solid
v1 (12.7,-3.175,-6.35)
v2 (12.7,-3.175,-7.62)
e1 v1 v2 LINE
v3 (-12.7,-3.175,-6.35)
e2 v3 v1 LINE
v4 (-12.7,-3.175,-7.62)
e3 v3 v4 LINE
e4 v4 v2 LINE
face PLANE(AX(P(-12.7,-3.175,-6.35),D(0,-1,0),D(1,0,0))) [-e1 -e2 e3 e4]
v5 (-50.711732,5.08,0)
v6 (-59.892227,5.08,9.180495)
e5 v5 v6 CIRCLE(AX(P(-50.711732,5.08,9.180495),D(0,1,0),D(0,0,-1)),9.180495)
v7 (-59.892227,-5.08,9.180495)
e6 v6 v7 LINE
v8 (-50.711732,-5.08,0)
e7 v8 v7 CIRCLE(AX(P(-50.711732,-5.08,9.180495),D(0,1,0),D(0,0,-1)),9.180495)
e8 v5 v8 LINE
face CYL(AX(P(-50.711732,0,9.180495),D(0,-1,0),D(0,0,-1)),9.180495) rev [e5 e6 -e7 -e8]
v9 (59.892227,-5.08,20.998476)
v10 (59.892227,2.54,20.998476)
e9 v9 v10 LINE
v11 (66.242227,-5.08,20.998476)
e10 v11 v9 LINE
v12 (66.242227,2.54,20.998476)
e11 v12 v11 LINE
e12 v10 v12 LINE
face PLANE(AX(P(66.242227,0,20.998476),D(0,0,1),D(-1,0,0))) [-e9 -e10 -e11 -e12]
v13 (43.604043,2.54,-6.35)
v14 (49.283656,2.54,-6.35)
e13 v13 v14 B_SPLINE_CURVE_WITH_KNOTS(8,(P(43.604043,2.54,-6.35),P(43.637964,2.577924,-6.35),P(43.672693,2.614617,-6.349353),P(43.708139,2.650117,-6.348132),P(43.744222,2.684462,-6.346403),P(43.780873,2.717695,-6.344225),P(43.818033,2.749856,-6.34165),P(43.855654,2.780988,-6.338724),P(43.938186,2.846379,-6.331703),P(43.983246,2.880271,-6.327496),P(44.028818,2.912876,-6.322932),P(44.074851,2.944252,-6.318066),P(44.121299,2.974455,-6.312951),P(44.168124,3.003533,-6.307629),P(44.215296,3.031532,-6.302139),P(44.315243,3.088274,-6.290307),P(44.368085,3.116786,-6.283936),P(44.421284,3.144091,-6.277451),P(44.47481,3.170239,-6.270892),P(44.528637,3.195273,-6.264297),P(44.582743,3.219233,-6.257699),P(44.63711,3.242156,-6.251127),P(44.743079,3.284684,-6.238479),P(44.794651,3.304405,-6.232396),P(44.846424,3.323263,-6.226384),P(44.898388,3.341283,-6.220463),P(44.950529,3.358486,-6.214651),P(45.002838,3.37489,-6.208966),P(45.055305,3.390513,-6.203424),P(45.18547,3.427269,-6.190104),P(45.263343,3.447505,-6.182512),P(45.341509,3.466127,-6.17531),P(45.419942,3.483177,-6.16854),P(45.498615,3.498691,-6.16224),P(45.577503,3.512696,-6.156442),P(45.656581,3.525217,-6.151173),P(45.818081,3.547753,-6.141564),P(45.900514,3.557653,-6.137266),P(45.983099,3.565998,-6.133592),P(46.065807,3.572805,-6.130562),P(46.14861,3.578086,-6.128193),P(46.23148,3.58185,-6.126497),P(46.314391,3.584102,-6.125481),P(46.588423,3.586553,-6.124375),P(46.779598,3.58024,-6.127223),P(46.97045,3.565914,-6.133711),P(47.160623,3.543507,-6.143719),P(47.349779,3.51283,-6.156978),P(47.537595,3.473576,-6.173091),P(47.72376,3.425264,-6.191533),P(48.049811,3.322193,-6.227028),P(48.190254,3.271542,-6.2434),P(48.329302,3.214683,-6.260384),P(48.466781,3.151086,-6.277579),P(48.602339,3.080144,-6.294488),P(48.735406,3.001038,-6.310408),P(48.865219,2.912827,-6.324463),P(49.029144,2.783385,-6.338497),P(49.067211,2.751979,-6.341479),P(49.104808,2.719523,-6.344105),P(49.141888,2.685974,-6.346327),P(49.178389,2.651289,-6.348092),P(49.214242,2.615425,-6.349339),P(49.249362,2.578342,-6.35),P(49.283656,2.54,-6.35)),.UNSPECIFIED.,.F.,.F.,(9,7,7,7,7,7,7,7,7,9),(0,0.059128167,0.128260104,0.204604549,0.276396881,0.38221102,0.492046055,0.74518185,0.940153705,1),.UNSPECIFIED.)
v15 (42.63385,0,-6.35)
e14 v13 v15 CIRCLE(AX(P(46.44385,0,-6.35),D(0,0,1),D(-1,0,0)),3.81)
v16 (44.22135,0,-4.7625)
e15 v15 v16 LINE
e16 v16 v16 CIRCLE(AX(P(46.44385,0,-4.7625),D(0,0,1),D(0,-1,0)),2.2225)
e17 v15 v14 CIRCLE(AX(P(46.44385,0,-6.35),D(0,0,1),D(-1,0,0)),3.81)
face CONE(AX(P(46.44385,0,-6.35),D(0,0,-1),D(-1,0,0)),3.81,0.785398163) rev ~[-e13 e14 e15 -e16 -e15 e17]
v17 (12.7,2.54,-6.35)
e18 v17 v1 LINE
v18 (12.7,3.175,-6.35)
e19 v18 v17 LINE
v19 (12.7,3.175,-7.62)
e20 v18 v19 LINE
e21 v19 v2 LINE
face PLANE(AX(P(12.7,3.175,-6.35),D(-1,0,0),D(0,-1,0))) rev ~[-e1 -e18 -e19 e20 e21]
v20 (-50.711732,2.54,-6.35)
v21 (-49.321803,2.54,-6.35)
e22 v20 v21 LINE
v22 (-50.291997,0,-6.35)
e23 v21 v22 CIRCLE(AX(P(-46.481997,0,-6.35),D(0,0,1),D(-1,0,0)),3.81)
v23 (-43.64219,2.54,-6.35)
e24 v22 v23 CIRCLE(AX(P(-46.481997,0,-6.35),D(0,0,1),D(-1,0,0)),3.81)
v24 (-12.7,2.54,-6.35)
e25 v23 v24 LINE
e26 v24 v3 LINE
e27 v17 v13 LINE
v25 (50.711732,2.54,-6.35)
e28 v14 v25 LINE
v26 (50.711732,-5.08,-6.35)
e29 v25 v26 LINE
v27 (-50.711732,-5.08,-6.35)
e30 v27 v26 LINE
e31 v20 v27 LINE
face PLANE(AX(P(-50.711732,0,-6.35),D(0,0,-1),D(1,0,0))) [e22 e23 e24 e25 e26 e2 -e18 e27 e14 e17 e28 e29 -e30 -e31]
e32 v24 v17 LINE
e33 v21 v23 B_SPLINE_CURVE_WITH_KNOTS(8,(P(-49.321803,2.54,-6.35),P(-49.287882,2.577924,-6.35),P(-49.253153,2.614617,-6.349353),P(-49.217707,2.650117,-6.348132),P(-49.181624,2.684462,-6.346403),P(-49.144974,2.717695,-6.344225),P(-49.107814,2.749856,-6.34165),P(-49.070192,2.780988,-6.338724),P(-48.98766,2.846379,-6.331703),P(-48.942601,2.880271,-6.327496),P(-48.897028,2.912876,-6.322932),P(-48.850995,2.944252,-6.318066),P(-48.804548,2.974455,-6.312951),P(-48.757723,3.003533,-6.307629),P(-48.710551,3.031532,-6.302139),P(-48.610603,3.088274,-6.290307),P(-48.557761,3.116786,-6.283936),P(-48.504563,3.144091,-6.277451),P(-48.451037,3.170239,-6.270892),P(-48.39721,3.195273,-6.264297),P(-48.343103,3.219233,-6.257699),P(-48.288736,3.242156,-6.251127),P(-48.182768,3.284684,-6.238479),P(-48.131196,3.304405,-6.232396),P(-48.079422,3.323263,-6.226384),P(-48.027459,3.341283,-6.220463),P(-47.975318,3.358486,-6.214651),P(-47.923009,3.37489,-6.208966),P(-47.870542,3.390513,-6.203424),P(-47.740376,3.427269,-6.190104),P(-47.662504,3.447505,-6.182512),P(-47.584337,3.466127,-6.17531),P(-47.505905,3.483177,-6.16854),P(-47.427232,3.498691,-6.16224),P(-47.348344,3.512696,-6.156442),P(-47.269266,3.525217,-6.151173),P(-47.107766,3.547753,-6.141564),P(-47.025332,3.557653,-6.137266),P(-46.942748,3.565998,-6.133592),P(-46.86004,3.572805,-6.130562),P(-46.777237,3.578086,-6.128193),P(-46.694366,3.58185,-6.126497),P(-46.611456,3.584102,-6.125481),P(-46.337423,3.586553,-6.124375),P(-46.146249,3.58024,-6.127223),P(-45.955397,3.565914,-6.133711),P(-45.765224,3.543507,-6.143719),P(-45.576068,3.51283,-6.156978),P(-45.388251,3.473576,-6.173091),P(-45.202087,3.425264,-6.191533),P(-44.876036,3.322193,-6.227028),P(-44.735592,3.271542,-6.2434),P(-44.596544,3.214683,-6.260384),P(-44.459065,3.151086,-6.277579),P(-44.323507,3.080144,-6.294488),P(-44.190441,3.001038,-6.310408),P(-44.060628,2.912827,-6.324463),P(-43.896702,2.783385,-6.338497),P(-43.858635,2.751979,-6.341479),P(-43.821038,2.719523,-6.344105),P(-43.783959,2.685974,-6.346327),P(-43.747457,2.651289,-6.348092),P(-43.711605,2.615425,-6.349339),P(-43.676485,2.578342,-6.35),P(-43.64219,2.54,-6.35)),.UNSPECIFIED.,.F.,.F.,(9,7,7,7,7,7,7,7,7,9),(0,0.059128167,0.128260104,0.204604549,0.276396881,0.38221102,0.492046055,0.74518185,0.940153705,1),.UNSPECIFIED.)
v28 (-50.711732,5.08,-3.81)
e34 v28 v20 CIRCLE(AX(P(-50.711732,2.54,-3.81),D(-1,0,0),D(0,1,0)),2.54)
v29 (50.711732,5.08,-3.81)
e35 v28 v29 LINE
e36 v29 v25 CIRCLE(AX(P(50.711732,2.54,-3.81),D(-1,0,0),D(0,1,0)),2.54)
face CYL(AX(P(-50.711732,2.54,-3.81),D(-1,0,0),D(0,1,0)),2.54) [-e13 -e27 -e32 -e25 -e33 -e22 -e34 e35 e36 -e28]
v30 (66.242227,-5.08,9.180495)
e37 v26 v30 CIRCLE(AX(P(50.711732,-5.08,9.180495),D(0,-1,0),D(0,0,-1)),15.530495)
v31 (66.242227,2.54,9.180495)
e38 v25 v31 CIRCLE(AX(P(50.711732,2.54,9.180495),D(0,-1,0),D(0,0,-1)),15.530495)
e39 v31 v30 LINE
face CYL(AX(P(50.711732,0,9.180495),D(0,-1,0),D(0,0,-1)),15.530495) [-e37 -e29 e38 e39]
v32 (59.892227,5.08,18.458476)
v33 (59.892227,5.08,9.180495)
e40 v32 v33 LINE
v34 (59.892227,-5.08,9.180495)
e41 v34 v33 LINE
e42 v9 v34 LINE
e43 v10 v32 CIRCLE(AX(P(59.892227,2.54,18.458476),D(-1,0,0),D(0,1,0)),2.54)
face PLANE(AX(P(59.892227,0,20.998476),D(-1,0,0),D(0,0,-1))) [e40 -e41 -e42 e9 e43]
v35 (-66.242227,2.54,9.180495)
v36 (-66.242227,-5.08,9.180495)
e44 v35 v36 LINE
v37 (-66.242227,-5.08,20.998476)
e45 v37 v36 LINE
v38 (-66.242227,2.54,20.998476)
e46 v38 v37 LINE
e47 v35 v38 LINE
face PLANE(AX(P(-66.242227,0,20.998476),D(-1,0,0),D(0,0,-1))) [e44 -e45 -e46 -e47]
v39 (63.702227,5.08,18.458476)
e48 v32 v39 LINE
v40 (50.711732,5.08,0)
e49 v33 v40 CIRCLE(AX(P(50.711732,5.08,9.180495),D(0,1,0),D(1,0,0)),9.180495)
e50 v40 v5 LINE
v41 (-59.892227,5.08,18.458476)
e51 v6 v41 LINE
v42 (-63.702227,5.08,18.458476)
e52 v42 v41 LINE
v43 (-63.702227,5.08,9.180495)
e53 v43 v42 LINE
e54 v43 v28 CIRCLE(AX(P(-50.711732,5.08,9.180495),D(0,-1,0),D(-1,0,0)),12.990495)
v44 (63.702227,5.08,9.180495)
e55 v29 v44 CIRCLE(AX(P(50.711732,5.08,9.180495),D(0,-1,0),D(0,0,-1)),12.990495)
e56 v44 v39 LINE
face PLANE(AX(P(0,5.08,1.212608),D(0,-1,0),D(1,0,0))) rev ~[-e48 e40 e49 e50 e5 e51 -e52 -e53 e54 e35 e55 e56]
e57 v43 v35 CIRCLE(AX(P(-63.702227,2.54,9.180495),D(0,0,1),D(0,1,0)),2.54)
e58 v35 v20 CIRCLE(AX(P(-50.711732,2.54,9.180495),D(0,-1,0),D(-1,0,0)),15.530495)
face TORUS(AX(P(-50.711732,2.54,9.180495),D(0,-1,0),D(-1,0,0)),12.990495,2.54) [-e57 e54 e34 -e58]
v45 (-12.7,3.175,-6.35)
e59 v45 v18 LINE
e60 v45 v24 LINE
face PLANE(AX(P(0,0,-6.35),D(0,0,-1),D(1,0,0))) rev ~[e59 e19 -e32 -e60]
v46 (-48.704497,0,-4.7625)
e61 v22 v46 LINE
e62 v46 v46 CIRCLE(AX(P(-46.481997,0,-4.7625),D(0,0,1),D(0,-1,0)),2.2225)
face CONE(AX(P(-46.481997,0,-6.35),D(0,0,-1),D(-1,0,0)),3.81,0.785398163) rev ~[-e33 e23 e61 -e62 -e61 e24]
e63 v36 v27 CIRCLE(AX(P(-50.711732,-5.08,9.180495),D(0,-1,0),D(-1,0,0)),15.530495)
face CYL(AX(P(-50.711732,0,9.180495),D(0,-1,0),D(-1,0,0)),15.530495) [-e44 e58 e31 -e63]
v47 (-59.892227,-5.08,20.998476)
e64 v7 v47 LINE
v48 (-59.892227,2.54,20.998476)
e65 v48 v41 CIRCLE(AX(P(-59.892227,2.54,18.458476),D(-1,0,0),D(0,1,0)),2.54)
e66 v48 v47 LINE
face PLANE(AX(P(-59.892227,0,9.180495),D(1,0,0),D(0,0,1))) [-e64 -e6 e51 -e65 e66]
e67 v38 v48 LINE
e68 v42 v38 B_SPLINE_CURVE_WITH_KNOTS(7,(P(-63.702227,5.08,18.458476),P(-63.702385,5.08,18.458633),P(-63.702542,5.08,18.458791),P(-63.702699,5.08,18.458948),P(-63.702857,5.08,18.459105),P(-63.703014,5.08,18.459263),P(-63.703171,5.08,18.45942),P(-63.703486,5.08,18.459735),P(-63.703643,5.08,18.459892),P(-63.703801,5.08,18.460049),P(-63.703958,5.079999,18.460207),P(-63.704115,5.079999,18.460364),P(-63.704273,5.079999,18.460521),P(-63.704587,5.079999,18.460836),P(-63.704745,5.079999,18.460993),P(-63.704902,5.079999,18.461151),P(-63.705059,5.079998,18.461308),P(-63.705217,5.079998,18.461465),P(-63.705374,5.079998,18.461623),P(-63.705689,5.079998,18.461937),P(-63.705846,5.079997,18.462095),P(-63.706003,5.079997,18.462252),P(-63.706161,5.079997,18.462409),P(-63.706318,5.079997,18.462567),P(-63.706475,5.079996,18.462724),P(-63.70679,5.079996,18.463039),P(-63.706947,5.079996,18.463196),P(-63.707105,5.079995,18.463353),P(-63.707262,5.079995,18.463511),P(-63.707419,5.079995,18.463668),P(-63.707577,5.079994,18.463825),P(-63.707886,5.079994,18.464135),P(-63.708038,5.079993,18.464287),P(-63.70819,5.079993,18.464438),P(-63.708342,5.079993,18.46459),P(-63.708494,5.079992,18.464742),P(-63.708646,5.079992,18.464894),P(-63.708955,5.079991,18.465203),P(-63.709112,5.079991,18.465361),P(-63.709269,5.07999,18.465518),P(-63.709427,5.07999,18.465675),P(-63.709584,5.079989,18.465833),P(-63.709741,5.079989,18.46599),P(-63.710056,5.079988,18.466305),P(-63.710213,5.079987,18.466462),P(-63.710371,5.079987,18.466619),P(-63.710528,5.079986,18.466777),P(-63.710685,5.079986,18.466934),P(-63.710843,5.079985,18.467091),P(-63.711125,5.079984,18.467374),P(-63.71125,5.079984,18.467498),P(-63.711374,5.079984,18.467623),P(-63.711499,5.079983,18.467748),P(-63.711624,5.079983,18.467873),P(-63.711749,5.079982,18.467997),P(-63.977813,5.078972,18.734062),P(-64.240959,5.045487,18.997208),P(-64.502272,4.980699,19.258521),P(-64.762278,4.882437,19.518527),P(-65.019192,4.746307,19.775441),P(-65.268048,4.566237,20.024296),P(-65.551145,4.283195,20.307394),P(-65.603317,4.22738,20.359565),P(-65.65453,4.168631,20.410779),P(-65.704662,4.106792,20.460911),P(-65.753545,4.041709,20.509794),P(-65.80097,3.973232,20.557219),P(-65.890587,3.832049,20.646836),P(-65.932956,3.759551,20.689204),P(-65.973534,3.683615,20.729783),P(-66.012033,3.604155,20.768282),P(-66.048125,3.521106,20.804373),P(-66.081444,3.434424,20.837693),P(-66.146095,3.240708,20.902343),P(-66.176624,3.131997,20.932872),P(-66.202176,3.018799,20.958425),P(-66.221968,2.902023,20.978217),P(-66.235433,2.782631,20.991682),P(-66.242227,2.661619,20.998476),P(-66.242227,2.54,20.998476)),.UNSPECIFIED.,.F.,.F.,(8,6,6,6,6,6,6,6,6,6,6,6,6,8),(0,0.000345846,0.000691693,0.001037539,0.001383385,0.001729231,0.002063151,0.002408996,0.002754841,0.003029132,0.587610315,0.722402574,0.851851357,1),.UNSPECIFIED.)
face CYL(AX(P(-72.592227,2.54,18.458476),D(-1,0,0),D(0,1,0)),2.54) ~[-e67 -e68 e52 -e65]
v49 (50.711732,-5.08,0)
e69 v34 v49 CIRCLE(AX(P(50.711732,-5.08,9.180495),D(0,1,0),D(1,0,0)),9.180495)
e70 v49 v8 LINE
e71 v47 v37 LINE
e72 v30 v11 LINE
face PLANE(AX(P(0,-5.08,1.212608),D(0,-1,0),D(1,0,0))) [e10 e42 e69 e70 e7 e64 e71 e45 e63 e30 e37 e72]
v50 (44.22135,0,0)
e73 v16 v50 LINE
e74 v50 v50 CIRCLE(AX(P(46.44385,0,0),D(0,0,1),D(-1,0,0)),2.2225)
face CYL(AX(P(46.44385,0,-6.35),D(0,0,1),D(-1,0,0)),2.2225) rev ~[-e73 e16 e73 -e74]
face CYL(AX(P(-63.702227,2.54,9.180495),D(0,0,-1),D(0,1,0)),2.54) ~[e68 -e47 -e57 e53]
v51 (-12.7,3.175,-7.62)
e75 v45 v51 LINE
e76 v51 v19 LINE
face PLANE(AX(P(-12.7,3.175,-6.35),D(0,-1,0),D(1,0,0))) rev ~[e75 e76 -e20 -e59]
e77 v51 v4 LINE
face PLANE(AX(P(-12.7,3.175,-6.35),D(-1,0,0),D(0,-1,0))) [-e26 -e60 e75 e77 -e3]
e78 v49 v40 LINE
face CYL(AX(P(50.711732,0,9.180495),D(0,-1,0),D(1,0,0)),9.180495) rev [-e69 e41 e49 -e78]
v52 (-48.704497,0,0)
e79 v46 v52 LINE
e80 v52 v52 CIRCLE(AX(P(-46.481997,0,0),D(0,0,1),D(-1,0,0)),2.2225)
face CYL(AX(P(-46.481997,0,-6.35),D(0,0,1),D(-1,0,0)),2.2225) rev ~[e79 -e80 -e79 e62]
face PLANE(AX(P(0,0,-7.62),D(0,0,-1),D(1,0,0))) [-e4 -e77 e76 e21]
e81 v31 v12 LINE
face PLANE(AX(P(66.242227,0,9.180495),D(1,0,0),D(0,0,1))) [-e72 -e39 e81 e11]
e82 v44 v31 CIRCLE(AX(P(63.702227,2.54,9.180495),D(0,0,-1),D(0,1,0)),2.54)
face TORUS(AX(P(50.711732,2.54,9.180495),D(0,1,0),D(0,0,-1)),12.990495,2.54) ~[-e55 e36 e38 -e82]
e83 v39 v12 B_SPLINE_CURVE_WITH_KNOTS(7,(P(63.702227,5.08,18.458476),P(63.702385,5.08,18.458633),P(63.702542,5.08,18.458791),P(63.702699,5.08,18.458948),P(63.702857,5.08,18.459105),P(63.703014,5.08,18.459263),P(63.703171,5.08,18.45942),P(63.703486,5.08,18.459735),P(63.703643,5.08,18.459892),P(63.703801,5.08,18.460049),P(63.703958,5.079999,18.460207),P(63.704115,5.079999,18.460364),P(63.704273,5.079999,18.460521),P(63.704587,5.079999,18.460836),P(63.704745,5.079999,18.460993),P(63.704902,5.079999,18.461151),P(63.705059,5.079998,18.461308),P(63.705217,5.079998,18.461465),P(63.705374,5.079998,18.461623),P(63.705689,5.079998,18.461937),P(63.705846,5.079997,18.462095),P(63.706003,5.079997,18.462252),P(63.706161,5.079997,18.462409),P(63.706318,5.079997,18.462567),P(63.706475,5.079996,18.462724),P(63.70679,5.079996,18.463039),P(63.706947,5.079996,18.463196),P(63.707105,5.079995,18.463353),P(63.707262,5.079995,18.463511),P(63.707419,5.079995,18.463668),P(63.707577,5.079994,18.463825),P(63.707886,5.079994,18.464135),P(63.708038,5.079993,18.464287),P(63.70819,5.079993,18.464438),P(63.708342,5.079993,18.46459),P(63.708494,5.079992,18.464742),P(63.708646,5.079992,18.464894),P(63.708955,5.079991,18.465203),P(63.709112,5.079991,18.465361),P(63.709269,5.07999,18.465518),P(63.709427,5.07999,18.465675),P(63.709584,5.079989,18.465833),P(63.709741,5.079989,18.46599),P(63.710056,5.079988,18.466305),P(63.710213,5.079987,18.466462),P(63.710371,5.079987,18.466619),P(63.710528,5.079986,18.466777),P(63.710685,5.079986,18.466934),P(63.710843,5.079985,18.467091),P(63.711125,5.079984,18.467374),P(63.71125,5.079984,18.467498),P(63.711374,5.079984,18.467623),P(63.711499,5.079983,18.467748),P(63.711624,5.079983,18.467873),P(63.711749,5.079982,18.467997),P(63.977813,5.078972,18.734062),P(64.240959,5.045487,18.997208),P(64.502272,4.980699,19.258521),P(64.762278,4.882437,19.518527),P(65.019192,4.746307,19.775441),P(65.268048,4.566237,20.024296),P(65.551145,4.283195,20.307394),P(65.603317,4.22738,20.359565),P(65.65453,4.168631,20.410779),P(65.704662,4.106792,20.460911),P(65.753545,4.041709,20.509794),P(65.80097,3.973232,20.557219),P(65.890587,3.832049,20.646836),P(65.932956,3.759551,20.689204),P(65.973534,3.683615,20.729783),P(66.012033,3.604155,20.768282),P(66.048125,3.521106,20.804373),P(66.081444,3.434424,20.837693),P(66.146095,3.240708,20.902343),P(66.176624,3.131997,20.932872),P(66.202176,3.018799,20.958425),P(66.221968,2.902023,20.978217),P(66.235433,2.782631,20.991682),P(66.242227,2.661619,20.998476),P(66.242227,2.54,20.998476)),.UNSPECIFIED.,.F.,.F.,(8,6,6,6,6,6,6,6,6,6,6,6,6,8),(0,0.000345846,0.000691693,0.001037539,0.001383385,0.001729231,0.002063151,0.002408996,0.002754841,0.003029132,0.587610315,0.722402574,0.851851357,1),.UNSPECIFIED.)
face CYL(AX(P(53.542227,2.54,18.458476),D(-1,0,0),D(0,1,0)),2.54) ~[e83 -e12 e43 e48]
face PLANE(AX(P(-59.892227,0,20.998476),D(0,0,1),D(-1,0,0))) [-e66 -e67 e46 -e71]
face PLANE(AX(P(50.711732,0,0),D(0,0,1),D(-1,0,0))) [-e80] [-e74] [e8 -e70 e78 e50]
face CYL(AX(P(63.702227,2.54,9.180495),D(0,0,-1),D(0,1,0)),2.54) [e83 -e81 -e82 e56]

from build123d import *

# Parameters (mm, degrees)
F1_DEPTH       = 5.08
F3_D           = 4.445
F3_CSINK_D     = 7.62
F3_CSINK_ANGLE = 90
F4_T1_DEPTH    = 101.4234647155
F4_T3_DEPTH    = 19.05
F4_T5_DEPTH    = 19.05
F4_T7_DEPTH    = 18.1679810636
F4_T10_ANGLE   = 90
F4_T12_ANGLE   = 90
F5_W           = 25.4
F5_H           = 6.35
F6_DEPTH       = 1.27


# Not quite as in the source:
# - a fillet or chamfer that OpenCascade refuses, or shapes differently, is made with other operations: its cross-section is extruded or revolved along the edge and cut away or added


with BuildPart() as f1:
    # F0 (on Front) → F1 (new body, symmetric)
    with BuildSketch(Plane.XZ):
        with BuildLine():
            Line((50.7117323577, 0), (0, 0))
            Line((0, 0), (-50.7117323577, 0))
            ThreePointArc((-50.7117323577, 0), (-57.2033226337, 2.6889047337), (-59.8922273673, 9.1804950096))
            Line((-59.8922273673, 9.1804950096), (-59.8922273673, 20.9984760731))
            Line((-59.8922273673, 20.9984760731), (-66.2422273673, 20.9984760731))
            Line((-66.2422273673, 20.9984760731), (-66.2422273673, 9.1804950096))
            ThreePointArc((-66.2422273673, 9.1804950096), (-61.6934506942, -1.8012233269), (-50.7117323577, -6.35))
            Line((-50.7117323577, -6.35), (0, -6.35))
            Line((0, -6.35), (50.7117323577, -6.35))
            ThreePointArc((50.7117323577, -6.35), (61.6934506942, -1.8012233269), (66.2422273673, 9.1804950096))
            Line((66.2422273673, 9.1804950096), (66.2422273673, 20.9984760731))
            Line((66.2422273673, 20.9984760731), (59.8922273673, 20.9984760731))
            Line((59.8922273673, 20.9984760731), (59.8922273673, 9.1804950096))
            ThreePointArc((59.8922273673, 9.1804950096), (57.2033226337, 2.6889047337), (50.7117323577, 0))
        make_face()
    extrude(amount=F1_DEPTH, both=True)

    # F3 (through all)
    with Locations(Plane(origin=(0, 0, -6.35), x_dir=(1, 0, 0), z_dir=(0, 0, -1))):
        with Locations((-46.4819967747, 0), (46.443849802, 0)):
            CounterSinkHole(F3_D / 2, F3_CSINK_D / 2, counter_sink_angle=F3_CSINK_ANGLE)

    # F4: fillet of radius 2.54 on 7 edges, made by hand

    # F4_s2 → F4_t1 (cut)
    with BuildSketch(Plane.YZ.offset(-50.7117323577)):
        with BuildLine():
            ThreePointArc((5.08, -3.81), (4.3360512242, -5.6060512242), (2.54, -6.35))
            Line((2.54, -6.35), (5.08, -6.35))
            Line((5.08, -6.35), (5.08, -3.81))
        make_face()
    extrude(amount=F4_T1_DEPTH, mode=Mode.SUBTRACT)

    # F4_s4 → F4_t3 (cut)
    with BuildSketch(Plane.YZ.offset(53.5422273673)):
        with BuildLine():
            ThreePointArc((5.08, 18.4584760731), (4.3360512242, 20.2545272974), (2.54, 20.9984760731))
            Line((2.54, 20.9984760731), (5.08, 20.9984760731))
            Line((5.08, 20.9984760731), (5.08, 18.4584760731))
        make_face()
    extrude(amount=F4_T3_DEPTH, mode=Mode.SUBTRACT)

    # F4_s6 → F4_t5 (cut)
    with BuildSketch(Plane.YZ.offset(-72.5922273673)):
        with BuildLine():
            ThreePointArc((5.08, 18.4584760731), (4.3360512242, 20.2545272974), (2.54, 20.9984760731))
            Line((2.54, 20.9984760731), (5.08, 20.9984760731))
            Line((5.08, 20.9984760731), (5.08, 18.4584760731))
        make_face()
    extrude(amount=F4_T5_DEPTH, mode=Mode.SUBTRACT)

    # F4_s8 → F4_t7 (cut)
    with BuildSketch(Plane.XY.offset(9.1804950096)):
        with BuildLine():
            ThreePointArc((63.7022273673, 5.08), (65.4982785915, 4.3360512242), (66.2422273673, 2.54))
            Line((66.2422273673, 2.54), (66.2422273673, 5.08))
            Line((66.2422273673, 5.08), (63.7022273673, 5.08))
        make_face()
        with BuildLine():
            ThreePointArc((-63.7022273673, 5.08), (-65.4982785915, 4.3360512242), (-66.2422273673, 2.54))
            Line((-66.2422273673, 2.54), (-66.2422273673, 5.08))
            Line((-66.2422273673, 5.08), (-63.7022273673, 5.08))
        make_face()
    extrude(amount=F4_T7_DEPTH, mode=Mode.SUBTRACT)

    # F4_s9 → F4_t10 (revolve, cut)
    with BuildSketch(Plane.YZ.offset(50.7117323577)):
        with BuildLine():
            ThreePointArc((2.54, -6.35), (4.3360512242, -5.6060512242), (5.08, -3.81))
            Line((5.08, -3.81), (5.08, -6.35))
            Line((5.08, -6.35), (2.54, -6.35))
        make_face()
    revolve(axis=Axis((50.7117323577, 5.08, 9.1804950096), (0, -1, 0)), revolution_arc=F4_T10_ANGLE, mode=Mode.SUBTRACT)

    # F4_s11 → F4_t12 (revolve, cut)
    with BuildSketch(Plane.XY.offset(9.1804950096)):
        with BuildLine():
            ThreePointArc((-63.7022273673, 5.08), (-65.4982785915, 4.3360512242), (-66.2422273673, 2.54))
            Line((-66.2422273673, 2.54), (-66.2422273673, 5.08))
            Line((-66.2422273673, 5.08), (-63.7022273673, 5.08))
        make_face()
    revolve(axis=Axis((-50.7117323577, 5.08, 9.1804950096), (0, -1, 0)), revolution_arc=F4_T12_ANGLE, mode=Mode.SUBTRACT)

    # F5 (on face) → F6 (join)
    with BuildSketch(Plane(origin=(0, 0, -6.35), x_dir=(1, 0, 0), z_dir=(0, 0, -1))):
        Rectangle(F5_W, F5_H)
    extrude(amount=F6_DEPTH)


solid = f1.part
